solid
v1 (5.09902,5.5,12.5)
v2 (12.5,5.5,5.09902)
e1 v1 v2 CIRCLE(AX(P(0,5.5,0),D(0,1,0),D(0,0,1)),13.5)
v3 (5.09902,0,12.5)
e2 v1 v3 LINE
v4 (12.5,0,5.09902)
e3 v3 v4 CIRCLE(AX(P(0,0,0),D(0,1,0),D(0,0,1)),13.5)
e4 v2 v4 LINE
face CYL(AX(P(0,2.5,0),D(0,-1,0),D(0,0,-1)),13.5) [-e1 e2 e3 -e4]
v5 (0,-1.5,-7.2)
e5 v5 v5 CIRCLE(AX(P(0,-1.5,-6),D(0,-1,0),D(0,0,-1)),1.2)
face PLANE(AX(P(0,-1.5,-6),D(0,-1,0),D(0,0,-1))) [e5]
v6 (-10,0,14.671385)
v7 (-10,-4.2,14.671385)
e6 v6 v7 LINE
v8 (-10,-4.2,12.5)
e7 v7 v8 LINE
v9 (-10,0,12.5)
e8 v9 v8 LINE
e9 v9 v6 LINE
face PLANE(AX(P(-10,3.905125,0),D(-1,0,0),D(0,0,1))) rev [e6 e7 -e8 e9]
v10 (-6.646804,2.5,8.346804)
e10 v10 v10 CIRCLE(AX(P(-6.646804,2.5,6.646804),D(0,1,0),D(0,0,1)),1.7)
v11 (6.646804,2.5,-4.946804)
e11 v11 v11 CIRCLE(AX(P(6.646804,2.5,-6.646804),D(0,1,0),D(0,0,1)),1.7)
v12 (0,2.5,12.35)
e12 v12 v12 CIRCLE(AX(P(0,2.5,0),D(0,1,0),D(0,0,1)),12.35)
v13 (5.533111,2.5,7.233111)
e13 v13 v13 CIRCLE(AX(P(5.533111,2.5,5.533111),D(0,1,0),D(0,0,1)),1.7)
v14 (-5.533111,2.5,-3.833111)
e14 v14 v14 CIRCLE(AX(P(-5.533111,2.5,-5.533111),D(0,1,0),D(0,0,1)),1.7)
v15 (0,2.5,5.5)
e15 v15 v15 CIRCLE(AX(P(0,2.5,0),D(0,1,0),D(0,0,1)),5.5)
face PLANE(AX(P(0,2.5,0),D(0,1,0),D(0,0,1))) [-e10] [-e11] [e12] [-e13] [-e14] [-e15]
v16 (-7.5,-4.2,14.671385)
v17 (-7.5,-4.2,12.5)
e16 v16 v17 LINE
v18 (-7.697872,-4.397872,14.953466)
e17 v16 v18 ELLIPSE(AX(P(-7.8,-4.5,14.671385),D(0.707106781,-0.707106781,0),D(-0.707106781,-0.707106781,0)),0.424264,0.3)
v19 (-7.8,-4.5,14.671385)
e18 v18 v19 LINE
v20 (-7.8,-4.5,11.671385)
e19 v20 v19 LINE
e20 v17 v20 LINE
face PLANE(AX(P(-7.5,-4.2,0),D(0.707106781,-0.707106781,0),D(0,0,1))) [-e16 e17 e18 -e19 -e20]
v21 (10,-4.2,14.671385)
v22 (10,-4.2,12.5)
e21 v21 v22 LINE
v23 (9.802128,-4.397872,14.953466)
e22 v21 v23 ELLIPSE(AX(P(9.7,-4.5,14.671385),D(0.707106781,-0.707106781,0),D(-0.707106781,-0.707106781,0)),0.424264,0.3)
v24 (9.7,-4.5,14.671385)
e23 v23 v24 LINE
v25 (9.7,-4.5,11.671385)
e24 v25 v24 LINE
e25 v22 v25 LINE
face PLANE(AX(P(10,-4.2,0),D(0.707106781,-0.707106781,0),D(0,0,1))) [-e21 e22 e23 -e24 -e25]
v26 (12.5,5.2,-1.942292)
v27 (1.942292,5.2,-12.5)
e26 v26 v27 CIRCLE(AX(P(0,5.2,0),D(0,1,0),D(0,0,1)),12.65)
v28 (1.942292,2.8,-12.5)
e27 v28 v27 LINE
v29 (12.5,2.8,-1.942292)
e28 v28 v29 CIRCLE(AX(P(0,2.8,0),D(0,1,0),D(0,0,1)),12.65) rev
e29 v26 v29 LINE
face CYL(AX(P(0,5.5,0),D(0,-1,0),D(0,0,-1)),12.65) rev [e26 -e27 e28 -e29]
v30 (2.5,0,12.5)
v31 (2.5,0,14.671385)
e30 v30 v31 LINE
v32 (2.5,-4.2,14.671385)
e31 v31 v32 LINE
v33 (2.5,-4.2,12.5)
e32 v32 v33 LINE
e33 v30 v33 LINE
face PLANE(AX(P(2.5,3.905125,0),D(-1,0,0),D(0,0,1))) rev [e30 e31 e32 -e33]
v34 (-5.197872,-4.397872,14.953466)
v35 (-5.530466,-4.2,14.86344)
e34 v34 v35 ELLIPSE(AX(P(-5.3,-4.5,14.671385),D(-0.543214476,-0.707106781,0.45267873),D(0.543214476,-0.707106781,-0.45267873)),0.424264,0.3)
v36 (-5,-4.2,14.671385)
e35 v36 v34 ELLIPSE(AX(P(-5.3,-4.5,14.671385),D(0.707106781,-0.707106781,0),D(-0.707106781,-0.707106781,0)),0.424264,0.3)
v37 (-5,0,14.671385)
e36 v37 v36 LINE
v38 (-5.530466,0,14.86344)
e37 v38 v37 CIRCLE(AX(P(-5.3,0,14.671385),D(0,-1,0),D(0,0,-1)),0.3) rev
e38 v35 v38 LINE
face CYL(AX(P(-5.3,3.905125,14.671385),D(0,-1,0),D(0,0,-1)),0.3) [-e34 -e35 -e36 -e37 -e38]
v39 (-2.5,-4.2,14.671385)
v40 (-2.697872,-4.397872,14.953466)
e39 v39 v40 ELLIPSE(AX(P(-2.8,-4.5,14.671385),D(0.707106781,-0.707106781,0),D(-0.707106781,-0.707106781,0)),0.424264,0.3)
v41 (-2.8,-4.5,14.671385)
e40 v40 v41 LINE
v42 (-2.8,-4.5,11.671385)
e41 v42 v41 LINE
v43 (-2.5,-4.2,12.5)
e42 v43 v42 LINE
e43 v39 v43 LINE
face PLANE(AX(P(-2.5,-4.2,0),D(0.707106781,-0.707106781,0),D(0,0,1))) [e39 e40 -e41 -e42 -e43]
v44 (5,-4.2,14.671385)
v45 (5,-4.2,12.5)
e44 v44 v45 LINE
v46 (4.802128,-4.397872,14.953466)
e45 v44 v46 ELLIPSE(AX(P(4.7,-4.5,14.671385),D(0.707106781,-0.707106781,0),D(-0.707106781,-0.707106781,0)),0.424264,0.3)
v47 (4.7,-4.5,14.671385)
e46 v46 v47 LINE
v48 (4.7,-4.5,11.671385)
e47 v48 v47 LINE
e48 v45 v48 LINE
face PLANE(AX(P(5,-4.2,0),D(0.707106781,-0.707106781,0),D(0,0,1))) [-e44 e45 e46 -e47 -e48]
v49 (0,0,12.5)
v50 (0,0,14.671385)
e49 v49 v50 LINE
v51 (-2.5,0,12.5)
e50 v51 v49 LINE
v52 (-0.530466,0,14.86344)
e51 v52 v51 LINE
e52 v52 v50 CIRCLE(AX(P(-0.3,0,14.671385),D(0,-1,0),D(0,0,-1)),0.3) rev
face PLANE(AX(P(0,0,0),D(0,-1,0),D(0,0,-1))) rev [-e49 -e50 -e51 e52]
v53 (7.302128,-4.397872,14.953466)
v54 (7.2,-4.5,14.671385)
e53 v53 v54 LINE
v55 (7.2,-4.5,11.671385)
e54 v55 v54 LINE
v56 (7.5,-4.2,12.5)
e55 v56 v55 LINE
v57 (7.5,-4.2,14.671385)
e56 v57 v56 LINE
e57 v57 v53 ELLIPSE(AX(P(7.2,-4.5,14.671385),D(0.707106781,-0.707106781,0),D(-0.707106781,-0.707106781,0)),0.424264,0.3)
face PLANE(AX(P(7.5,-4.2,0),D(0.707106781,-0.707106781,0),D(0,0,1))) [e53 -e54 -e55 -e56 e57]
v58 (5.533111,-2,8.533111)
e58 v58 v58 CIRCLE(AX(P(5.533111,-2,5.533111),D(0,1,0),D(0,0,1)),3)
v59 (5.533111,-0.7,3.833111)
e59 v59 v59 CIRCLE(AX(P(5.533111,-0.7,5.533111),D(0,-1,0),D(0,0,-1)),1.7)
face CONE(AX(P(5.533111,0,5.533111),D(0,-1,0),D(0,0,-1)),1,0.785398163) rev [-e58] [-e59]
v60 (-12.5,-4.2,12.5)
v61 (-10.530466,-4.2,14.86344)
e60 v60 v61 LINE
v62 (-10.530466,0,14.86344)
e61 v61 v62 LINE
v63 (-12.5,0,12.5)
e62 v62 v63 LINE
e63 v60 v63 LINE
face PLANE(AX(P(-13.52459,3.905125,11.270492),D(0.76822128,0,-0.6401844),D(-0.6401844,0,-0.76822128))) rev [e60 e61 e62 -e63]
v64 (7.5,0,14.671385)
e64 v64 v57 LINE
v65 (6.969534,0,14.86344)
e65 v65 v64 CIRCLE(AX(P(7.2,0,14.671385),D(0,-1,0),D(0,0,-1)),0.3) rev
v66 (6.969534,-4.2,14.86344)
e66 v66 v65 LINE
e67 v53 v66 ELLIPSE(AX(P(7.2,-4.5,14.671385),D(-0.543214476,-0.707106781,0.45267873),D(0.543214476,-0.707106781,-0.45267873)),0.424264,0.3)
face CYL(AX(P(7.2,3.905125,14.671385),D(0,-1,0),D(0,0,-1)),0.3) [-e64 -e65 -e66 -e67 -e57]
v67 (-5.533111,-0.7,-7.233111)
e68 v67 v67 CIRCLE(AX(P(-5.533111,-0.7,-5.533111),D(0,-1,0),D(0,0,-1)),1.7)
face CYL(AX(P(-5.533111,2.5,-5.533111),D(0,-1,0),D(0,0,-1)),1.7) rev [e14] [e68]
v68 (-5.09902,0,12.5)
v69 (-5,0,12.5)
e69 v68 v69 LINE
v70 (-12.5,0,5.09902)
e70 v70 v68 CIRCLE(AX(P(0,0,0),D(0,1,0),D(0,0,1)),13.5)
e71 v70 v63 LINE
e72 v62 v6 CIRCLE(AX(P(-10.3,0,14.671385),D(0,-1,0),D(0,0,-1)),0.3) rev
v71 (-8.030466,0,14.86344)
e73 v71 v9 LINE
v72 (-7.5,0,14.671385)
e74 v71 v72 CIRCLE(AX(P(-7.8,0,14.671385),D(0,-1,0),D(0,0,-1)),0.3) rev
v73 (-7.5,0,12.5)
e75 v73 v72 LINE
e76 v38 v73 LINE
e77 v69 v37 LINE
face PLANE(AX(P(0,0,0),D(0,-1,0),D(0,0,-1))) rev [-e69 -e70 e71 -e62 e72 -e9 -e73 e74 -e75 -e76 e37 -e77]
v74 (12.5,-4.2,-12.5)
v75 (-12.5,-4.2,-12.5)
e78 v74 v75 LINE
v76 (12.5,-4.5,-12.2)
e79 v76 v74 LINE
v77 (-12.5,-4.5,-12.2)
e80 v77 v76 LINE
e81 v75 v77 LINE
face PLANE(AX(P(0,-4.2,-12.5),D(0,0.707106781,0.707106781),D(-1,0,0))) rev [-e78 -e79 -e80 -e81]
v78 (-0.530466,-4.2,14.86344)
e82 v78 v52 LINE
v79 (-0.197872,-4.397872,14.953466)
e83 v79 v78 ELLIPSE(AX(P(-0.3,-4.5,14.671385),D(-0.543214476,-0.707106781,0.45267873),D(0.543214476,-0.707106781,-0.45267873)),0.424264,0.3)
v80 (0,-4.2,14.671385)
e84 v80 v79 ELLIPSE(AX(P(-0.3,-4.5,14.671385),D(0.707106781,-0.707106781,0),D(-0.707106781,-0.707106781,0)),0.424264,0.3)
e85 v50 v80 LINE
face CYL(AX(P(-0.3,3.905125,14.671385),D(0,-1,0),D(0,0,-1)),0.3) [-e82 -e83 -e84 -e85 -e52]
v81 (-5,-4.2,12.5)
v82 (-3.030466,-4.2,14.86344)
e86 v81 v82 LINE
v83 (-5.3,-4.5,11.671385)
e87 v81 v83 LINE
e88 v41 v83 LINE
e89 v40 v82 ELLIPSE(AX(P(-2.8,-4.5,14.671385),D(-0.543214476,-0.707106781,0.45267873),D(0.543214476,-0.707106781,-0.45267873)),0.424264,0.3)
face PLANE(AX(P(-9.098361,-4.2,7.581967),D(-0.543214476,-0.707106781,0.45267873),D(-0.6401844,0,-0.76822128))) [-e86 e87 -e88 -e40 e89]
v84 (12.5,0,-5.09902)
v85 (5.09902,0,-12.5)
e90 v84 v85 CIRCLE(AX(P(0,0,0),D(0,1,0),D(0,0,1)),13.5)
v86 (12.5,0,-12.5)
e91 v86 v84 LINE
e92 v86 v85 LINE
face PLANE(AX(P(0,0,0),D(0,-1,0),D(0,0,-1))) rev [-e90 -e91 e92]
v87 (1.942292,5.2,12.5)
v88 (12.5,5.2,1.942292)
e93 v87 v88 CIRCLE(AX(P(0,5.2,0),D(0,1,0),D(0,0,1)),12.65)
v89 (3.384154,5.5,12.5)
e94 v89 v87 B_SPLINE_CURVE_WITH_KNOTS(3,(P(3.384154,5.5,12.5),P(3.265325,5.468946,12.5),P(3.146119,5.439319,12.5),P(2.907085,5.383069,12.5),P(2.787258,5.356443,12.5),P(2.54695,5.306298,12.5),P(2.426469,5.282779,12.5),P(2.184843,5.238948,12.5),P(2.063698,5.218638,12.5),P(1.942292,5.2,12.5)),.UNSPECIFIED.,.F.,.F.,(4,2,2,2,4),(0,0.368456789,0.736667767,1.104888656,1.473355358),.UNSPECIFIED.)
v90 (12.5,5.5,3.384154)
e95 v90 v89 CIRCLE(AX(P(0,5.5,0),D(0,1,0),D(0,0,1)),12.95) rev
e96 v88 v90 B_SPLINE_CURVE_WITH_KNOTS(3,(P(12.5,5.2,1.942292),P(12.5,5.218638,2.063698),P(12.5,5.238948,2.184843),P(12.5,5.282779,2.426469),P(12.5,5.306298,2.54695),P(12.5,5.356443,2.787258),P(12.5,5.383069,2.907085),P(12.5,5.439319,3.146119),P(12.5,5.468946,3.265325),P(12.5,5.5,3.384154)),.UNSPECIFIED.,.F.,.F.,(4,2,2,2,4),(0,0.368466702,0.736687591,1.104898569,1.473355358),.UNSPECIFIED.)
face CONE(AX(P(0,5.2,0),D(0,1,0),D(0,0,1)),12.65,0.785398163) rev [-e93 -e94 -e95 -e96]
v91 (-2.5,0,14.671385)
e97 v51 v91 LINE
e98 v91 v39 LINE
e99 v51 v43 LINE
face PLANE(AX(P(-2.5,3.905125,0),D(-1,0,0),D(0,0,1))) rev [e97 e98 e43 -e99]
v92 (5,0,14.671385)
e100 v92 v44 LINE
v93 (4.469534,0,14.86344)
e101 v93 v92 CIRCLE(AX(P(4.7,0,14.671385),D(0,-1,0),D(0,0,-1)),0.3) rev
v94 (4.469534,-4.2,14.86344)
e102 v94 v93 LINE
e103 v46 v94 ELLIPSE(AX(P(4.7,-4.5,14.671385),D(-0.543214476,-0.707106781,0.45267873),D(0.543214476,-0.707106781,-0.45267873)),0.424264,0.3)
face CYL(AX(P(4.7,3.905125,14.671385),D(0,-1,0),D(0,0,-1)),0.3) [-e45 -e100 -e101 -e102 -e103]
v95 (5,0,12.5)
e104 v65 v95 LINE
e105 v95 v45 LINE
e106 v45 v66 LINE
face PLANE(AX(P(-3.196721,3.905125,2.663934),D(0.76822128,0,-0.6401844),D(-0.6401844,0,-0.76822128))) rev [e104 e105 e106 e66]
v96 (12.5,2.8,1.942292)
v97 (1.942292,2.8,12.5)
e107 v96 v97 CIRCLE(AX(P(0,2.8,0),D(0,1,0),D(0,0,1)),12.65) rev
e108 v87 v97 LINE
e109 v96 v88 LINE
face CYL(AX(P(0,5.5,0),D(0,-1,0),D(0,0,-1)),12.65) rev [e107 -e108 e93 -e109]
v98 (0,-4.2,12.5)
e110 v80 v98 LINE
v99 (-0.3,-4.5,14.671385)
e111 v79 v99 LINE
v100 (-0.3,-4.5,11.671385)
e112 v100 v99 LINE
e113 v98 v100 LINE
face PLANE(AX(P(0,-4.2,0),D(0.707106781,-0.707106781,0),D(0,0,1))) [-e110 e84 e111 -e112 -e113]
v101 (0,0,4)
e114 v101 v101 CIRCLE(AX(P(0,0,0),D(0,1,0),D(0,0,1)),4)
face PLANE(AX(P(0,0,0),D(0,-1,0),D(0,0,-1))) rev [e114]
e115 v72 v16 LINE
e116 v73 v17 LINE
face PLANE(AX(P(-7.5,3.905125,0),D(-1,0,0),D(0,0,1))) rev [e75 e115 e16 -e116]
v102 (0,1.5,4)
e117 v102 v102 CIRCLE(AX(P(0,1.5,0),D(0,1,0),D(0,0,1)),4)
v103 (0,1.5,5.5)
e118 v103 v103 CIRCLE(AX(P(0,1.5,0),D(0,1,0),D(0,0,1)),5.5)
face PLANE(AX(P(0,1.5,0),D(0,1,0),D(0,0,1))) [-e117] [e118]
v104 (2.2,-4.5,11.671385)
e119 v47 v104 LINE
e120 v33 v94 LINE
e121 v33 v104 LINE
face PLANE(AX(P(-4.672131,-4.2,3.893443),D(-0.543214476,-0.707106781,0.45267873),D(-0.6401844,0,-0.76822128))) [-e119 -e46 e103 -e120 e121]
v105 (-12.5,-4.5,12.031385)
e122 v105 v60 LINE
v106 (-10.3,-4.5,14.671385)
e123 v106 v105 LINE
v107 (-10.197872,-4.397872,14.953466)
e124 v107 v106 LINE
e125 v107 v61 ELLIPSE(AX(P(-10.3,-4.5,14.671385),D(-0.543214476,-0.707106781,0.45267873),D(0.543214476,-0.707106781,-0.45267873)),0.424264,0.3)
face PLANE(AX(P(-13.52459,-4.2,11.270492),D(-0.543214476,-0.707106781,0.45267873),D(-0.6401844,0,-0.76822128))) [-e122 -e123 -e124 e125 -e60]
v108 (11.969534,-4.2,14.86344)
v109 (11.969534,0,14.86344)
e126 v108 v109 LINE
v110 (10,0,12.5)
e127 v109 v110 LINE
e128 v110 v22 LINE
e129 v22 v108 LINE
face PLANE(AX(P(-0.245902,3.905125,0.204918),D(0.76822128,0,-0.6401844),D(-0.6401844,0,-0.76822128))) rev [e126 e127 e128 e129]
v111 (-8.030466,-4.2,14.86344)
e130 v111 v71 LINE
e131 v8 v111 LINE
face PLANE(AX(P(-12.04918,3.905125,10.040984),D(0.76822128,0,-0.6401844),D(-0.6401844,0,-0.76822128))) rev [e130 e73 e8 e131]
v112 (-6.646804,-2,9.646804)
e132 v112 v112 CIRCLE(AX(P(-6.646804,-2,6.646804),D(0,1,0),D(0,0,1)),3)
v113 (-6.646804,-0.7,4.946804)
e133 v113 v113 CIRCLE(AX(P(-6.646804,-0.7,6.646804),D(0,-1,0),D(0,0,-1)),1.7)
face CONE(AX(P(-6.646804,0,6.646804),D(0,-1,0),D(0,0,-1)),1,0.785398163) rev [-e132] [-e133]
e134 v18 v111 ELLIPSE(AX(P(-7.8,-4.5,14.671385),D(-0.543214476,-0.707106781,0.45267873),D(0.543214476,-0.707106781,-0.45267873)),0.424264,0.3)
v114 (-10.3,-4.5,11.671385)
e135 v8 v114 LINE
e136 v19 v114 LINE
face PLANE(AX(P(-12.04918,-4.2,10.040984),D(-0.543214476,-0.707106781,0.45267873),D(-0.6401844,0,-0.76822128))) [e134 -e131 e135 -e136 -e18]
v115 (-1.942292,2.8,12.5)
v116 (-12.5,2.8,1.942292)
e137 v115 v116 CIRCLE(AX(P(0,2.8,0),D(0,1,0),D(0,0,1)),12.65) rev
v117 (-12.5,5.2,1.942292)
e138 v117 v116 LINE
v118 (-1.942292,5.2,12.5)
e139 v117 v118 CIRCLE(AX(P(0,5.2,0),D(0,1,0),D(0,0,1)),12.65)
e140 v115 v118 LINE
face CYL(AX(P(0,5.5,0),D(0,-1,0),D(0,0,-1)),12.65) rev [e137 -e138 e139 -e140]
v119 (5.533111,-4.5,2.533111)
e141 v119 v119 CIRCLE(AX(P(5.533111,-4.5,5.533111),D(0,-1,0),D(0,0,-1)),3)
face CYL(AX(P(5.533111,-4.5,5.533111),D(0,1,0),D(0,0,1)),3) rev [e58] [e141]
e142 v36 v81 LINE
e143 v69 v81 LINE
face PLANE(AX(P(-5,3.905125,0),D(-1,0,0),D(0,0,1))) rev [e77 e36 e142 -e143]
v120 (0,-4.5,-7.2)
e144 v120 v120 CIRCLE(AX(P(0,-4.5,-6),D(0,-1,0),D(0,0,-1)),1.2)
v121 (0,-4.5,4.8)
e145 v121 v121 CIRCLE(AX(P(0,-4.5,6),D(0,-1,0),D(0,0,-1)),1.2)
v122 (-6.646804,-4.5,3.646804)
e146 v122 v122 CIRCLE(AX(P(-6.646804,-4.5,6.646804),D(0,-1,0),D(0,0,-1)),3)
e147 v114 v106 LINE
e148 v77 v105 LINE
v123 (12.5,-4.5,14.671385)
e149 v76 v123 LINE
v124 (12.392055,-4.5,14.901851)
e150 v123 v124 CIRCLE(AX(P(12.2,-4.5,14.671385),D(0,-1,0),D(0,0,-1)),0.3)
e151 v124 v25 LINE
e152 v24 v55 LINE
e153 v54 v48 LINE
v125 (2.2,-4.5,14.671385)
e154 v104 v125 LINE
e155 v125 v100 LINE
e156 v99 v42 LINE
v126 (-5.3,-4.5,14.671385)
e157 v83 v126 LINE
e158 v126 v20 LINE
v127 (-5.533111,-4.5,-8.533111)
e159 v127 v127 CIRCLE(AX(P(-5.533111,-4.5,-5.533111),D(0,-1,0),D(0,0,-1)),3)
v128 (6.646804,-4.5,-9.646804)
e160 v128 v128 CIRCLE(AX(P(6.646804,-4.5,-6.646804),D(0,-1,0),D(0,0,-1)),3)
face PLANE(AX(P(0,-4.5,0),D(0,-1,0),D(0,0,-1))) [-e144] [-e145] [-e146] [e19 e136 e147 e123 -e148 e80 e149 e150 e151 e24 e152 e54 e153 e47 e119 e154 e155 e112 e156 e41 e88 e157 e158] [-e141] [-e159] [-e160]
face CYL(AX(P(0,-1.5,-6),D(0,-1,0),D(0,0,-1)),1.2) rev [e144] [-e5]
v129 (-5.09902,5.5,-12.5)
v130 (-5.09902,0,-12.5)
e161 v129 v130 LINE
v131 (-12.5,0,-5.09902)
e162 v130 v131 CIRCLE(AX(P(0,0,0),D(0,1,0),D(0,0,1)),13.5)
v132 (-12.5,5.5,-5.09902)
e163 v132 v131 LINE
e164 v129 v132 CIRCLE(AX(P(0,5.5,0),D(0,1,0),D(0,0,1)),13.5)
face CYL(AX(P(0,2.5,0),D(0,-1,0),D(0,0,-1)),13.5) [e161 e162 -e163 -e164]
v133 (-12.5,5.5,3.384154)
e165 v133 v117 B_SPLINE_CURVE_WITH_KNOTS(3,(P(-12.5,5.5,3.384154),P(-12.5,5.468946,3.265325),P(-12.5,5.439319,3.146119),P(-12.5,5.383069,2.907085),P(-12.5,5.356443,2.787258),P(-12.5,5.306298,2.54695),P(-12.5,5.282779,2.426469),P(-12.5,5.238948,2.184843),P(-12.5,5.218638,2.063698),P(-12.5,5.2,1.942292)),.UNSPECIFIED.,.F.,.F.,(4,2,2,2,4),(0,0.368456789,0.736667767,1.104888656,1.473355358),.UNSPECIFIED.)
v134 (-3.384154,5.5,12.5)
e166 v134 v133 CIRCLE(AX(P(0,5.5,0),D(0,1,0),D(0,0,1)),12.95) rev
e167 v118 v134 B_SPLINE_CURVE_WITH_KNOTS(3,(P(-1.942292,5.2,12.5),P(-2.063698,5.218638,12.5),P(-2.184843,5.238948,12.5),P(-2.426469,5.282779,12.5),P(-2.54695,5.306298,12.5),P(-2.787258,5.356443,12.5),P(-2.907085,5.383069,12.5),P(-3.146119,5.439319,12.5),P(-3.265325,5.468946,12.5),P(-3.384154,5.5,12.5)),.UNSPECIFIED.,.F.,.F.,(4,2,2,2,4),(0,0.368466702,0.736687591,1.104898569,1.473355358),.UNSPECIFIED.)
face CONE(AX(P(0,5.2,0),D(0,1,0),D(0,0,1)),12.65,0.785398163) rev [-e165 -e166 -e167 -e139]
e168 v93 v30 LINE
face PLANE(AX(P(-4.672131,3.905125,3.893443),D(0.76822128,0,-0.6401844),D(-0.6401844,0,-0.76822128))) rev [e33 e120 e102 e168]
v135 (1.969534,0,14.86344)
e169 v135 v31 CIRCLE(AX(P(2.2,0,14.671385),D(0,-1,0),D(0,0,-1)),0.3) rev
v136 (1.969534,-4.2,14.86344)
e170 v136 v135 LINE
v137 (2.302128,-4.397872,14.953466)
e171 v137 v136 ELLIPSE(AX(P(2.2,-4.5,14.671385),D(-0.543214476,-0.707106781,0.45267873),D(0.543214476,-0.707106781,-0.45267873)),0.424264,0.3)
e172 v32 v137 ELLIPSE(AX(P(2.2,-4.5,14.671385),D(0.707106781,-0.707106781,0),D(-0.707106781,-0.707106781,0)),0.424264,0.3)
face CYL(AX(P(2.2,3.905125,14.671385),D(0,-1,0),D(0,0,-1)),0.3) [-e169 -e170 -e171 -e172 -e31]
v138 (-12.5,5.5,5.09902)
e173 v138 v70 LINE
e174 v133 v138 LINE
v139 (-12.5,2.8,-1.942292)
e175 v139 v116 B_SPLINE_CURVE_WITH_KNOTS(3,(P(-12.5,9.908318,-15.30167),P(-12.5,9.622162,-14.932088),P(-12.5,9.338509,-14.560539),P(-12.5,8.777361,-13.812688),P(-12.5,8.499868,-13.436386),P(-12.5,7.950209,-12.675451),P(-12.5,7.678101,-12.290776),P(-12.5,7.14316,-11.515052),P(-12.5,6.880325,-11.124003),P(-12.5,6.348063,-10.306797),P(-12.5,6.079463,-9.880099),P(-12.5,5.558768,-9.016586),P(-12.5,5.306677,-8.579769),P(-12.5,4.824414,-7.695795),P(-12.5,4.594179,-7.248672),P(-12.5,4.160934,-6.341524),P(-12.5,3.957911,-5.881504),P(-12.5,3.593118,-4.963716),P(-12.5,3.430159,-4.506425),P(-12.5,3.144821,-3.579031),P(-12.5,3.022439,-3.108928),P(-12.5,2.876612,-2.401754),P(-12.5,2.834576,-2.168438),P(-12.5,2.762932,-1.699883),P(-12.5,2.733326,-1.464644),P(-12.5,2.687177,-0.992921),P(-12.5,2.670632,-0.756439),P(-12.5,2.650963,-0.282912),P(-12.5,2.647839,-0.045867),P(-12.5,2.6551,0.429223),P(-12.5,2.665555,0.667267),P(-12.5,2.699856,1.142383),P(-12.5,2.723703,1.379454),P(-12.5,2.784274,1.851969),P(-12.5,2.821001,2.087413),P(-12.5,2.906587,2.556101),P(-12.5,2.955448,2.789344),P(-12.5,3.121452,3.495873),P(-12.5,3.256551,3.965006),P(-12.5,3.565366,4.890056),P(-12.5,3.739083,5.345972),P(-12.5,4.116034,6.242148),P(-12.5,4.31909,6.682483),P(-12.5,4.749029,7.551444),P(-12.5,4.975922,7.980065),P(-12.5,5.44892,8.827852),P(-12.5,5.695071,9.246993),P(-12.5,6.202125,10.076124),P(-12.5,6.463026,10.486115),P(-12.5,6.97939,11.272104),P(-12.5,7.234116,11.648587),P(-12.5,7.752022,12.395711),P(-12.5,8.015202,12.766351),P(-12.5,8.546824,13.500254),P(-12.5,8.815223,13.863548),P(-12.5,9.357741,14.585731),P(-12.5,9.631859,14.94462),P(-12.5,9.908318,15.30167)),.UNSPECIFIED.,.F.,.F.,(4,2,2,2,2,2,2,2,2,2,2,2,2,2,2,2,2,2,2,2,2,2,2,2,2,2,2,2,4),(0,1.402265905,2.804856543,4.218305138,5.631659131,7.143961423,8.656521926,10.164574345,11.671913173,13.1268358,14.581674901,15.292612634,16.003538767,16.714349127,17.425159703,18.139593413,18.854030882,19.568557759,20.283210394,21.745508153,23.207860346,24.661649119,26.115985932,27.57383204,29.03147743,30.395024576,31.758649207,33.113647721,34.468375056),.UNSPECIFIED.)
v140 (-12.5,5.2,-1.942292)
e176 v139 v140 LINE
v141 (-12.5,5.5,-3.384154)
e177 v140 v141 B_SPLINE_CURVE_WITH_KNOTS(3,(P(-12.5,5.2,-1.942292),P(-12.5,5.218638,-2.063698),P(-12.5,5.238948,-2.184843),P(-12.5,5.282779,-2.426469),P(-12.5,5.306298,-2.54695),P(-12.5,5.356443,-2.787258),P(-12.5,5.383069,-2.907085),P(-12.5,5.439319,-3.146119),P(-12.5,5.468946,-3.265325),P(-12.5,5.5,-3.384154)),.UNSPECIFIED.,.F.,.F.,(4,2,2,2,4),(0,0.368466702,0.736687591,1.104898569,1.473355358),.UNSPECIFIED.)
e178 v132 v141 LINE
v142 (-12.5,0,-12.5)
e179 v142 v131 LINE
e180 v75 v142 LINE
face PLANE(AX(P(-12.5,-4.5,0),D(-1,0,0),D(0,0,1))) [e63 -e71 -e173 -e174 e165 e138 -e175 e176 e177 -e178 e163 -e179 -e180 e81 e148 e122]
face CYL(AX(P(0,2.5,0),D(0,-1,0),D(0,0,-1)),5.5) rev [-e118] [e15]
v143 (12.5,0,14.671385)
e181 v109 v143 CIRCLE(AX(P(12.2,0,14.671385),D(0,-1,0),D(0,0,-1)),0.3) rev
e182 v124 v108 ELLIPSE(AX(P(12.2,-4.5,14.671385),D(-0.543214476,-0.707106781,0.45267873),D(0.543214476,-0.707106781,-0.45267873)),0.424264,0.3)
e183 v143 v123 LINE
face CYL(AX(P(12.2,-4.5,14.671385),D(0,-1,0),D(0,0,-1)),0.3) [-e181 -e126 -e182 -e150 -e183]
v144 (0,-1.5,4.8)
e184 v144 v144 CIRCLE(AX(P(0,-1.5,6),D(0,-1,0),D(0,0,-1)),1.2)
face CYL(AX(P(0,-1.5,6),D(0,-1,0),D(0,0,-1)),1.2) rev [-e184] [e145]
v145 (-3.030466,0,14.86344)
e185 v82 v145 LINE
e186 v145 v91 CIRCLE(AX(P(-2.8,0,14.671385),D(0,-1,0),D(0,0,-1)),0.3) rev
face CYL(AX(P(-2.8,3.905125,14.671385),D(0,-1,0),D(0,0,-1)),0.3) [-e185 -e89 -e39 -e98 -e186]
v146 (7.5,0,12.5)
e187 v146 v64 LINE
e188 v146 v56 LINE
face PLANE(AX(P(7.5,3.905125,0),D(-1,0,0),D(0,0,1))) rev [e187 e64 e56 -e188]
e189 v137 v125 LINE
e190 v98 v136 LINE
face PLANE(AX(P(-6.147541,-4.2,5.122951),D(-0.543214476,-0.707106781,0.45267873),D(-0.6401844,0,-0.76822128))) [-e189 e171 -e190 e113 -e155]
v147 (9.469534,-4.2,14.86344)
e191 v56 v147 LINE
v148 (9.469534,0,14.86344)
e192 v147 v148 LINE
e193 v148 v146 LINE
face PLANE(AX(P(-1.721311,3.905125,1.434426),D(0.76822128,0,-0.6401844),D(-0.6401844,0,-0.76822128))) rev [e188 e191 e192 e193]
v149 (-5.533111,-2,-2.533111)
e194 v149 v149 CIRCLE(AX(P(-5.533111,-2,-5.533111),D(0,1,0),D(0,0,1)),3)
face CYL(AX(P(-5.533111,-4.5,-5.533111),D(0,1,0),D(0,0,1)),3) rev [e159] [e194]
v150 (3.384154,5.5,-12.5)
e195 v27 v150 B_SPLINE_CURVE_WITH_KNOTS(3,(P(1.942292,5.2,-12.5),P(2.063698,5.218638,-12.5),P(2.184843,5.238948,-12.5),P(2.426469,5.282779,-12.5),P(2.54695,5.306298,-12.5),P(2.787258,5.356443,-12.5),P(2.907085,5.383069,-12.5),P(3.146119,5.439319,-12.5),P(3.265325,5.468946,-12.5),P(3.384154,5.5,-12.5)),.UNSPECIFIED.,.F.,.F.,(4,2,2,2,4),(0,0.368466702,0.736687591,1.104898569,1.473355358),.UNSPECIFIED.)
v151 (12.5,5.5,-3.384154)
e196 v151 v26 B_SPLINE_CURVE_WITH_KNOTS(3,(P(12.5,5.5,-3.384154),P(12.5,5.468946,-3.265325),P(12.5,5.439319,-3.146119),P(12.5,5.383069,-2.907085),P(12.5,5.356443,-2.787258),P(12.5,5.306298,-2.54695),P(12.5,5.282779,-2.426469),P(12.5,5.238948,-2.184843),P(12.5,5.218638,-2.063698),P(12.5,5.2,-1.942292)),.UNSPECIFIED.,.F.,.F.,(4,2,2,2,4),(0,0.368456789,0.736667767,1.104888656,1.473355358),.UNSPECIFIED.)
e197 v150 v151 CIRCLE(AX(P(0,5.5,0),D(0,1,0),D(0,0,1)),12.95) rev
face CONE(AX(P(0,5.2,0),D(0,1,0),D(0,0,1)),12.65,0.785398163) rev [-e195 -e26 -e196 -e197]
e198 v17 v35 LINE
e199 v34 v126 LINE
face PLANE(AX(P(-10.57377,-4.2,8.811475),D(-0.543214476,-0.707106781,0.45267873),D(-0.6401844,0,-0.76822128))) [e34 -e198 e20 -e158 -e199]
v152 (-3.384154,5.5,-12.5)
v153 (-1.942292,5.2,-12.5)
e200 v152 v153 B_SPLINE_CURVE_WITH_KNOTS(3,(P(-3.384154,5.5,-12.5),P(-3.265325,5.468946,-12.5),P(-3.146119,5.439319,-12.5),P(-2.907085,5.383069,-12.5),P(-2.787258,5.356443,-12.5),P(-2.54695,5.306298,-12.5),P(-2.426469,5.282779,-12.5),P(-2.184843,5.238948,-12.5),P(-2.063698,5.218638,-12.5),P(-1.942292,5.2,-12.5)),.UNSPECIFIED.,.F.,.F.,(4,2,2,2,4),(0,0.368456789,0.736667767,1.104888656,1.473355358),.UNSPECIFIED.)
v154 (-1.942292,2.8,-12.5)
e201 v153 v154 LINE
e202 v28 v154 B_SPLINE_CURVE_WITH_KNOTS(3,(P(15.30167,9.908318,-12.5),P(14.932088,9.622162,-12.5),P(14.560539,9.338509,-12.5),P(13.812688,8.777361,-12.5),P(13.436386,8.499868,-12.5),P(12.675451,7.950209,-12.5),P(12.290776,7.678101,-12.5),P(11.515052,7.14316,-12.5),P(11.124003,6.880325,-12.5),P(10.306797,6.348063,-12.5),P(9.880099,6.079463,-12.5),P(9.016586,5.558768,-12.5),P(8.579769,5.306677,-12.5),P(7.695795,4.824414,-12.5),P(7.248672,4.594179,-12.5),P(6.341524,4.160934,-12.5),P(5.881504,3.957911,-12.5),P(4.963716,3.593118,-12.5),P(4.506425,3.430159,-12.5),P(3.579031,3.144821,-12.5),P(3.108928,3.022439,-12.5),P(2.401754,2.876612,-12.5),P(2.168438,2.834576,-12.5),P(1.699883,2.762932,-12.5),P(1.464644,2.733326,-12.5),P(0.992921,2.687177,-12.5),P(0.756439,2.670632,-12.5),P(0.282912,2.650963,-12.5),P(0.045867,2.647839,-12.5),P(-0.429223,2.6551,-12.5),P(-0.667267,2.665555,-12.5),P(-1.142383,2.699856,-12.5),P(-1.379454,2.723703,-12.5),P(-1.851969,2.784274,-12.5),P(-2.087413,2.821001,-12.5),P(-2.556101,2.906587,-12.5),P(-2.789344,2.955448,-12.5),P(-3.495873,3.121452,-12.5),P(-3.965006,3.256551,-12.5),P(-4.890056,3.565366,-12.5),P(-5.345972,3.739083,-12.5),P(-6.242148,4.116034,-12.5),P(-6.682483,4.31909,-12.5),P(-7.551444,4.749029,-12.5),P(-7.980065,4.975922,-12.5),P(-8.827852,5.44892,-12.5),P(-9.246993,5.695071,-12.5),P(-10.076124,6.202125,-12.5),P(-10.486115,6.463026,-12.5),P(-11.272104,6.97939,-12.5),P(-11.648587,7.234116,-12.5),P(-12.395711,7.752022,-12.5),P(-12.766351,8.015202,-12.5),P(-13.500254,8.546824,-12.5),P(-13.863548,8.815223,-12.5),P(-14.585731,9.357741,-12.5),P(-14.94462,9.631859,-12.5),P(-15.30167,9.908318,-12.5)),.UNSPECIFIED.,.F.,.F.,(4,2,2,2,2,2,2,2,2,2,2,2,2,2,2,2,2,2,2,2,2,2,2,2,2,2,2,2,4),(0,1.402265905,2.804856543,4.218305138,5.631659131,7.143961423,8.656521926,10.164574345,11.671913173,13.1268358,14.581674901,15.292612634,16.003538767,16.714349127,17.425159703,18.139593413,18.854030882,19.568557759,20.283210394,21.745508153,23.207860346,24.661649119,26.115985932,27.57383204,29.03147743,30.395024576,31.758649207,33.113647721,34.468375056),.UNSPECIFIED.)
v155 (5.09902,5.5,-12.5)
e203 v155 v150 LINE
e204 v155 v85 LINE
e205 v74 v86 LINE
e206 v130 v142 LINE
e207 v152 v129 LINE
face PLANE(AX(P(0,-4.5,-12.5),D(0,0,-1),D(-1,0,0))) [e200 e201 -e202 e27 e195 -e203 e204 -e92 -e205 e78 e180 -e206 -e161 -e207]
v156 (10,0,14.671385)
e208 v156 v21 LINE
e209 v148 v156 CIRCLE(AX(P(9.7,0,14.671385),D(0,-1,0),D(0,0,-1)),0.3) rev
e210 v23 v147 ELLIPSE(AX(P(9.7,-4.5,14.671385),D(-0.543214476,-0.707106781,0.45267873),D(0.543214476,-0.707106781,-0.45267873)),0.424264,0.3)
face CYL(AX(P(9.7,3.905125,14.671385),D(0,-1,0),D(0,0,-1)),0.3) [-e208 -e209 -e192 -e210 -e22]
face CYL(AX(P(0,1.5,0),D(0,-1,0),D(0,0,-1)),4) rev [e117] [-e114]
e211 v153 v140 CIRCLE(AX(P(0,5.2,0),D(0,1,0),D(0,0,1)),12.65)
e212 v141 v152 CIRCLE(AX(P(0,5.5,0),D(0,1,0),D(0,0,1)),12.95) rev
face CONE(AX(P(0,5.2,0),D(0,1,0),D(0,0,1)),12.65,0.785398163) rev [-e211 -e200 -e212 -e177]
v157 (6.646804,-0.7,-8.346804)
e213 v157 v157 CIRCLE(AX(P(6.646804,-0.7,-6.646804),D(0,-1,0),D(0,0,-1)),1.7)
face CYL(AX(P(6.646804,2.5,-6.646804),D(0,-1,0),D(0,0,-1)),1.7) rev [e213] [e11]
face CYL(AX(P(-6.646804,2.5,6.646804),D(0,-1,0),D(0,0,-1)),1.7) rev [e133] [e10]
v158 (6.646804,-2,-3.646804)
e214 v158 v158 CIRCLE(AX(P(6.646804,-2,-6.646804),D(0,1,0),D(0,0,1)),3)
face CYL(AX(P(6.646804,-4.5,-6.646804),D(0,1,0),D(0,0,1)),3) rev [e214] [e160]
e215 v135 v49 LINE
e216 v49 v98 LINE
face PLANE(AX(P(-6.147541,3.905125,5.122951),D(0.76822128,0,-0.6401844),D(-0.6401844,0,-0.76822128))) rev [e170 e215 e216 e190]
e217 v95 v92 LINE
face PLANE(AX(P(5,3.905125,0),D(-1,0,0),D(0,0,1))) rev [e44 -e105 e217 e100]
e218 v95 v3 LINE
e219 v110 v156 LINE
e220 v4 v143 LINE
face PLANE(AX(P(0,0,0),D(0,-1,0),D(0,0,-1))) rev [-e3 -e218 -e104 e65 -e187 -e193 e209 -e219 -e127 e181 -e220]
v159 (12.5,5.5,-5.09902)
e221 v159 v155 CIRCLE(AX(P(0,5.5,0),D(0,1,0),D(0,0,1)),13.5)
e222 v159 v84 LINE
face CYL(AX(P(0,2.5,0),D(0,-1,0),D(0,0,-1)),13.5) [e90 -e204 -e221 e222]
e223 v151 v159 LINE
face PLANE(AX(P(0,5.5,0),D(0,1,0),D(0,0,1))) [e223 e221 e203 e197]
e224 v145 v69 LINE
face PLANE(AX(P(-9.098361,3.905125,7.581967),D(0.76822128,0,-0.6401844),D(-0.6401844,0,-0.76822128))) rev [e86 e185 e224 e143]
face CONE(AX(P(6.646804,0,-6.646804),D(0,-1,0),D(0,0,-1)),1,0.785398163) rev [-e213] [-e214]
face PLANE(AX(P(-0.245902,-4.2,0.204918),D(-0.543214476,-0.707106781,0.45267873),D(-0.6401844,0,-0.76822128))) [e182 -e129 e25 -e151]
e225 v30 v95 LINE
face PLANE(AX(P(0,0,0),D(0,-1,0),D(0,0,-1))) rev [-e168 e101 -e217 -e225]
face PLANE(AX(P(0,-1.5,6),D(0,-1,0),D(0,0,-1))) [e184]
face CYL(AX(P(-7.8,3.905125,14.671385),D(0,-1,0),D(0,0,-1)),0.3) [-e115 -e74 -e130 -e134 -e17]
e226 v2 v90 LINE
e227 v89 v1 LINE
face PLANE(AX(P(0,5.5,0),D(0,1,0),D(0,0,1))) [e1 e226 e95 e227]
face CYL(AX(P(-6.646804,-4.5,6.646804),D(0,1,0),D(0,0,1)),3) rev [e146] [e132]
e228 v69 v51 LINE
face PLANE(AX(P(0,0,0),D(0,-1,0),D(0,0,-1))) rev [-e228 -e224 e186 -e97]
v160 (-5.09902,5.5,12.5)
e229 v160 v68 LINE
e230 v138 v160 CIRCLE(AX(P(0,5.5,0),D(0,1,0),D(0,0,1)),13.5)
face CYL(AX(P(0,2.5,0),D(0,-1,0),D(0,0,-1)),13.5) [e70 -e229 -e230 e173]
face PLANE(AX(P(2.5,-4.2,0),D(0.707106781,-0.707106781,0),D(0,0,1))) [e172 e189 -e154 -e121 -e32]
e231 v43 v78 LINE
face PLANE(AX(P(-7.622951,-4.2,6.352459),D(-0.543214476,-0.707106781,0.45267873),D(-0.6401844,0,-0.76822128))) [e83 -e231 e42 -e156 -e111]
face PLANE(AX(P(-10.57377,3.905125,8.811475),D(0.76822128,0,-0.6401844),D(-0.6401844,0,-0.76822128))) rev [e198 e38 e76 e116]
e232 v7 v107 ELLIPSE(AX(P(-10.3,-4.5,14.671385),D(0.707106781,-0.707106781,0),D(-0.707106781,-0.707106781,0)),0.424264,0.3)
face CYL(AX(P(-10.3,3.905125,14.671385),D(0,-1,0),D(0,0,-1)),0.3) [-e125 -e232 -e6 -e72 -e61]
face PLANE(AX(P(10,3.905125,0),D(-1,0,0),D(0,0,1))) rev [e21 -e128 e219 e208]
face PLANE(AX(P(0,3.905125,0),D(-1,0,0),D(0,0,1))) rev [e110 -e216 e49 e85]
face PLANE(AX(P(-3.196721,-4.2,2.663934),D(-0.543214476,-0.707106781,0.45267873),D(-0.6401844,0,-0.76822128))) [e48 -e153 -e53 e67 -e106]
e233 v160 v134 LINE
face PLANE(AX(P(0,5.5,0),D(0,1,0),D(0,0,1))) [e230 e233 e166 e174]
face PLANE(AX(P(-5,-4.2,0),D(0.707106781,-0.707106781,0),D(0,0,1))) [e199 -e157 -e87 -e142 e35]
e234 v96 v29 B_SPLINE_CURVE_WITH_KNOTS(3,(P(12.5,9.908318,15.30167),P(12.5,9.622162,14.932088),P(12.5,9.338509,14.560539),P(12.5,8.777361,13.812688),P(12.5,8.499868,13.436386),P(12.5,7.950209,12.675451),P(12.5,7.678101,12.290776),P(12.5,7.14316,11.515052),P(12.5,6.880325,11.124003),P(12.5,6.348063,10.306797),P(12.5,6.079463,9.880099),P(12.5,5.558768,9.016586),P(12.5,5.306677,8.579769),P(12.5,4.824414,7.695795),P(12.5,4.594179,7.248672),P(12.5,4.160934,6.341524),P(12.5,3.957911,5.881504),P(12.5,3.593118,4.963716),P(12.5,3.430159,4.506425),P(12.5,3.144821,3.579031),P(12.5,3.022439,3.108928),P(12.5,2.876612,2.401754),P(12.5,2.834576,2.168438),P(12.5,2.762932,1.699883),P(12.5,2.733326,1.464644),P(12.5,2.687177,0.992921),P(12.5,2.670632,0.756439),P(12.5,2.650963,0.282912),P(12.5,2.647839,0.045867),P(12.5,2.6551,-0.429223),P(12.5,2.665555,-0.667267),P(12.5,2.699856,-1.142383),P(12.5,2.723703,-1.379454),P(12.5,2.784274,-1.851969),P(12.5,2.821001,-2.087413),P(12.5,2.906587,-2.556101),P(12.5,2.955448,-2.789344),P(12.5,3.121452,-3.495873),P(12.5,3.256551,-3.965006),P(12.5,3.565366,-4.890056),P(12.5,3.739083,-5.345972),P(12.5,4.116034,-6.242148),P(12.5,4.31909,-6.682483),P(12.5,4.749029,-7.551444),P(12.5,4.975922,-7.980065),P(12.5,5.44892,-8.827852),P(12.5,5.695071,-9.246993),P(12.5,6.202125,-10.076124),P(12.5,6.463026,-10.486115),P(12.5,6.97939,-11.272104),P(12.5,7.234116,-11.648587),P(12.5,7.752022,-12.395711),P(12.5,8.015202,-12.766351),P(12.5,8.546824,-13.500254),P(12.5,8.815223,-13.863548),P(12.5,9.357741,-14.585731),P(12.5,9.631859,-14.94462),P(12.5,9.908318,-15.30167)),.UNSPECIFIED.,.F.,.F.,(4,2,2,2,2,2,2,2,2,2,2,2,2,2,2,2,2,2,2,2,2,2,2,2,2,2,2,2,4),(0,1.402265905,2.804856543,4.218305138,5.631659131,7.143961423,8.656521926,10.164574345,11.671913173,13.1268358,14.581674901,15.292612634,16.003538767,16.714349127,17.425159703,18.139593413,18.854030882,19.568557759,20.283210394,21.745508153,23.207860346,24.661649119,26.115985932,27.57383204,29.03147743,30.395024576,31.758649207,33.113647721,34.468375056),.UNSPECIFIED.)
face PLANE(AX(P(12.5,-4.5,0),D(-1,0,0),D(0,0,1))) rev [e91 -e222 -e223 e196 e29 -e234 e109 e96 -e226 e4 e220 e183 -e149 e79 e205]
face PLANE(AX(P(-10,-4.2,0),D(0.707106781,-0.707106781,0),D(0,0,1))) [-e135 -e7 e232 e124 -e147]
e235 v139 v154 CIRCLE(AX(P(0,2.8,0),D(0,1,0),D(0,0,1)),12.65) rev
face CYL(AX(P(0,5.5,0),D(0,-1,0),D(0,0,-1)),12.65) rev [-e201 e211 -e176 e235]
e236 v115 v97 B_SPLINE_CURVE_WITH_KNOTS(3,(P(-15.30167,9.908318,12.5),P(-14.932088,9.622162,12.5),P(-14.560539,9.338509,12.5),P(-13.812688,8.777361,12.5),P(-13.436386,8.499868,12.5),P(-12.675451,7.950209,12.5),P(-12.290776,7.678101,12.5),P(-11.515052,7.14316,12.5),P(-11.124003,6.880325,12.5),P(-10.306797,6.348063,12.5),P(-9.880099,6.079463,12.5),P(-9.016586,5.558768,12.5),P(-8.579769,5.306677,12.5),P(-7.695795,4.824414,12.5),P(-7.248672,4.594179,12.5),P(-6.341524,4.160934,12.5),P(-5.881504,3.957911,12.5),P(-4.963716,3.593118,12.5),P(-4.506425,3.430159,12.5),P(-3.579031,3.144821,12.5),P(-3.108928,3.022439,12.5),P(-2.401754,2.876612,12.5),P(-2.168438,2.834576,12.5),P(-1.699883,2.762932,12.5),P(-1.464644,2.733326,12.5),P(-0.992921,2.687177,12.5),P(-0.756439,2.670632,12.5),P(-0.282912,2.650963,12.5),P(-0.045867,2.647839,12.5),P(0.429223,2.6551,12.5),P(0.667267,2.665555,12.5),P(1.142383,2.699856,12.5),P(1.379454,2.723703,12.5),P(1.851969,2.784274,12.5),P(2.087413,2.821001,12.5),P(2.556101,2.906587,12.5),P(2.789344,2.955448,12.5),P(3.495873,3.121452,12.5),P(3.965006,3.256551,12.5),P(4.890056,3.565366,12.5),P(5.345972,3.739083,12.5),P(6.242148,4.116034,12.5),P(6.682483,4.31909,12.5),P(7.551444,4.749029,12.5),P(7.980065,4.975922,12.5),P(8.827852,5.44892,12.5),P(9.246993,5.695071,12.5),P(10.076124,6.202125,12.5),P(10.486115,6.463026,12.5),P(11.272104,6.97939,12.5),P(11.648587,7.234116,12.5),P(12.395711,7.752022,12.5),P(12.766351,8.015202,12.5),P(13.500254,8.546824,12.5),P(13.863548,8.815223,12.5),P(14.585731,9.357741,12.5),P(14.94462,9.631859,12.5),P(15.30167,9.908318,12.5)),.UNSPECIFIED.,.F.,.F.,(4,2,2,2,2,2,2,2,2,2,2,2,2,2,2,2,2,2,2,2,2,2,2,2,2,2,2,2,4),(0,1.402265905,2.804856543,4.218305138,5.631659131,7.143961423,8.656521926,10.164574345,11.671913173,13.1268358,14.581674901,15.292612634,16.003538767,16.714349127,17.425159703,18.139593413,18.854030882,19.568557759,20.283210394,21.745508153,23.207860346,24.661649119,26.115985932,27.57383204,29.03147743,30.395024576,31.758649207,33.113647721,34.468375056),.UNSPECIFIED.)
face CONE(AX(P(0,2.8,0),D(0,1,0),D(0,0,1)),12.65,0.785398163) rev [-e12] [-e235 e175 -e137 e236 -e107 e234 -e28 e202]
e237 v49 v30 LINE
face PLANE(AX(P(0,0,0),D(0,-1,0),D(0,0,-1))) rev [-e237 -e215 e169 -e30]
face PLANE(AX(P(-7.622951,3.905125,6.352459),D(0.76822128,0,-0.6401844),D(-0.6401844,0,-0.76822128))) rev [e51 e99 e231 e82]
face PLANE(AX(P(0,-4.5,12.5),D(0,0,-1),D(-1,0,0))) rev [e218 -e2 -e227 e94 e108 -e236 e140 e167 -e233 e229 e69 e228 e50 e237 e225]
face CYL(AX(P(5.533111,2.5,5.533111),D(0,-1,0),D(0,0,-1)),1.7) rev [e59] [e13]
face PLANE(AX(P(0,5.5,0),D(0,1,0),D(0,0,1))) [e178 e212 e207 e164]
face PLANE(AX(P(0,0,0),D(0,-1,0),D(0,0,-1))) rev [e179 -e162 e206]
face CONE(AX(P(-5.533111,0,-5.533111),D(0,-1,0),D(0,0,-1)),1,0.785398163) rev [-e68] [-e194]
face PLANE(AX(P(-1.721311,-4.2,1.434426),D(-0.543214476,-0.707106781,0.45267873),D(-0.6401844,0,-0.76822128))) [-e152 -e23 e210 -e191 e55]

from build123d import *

# Parameters (mm, degrees)
SKETCH1_R           = 13.5
SKETCH1_R_2         = 1.7
SKETCH1_R_3         = 5.5
BOSS_EXTRUDE1_DEPTH = 2.5
SKETCH2_R           = 13.5
SKETCH2_R_2         = 12.65
BOSS_EXTRUDE2_DEPTH = 3
SKETCH3_W           = 25
SKETCH3_H           = 25
SKETCH3_R           = 3
BOSS_EXTRUDE3_DEPTH = 4.5
CHAMFER2_SIZE       = 0.3
SKETCH4_R           = 4
BOSS_EXTRUDE4_DEPTH = 1.5
CUT_EXTRUDE1_DEPTH  = 20.868316486
CHAMFER3_SIZE       = 0.3
BOSS_EXTRUDE5_DEPTH = 4.5
CHAMFER4_SIZE       = 0.3
FILLET1_R           = 0.3
SKETCH8_R           = 1.2
CUT_EXTRUDE2_DEPTH  = 3
CHAMFER5_SIZE       = 2


with BuildPart() as part:
    # Sketch1 → Boss-Extrude1 (new body)
    with BuildSketch(Plane(origin=(0, 0, 0), x_dir=(1, 0, 0), z_dir=(0, 1, 0))):
        with Locations(Location((0, 0, 0), (0, 0, 270))):
            Circle(SKETCH1_R)
        with Locations(Location((6.646803743, 6.646803743, 0), (0, 0, 270))):
            Circle(SKETCH1_R_2, mode=Mode.SUBTRACT)
        with Locations(Location((-6.646803743, -6.646803743, 0), (0, 0, 270))):
            Circle(SKETCH1_R_2, mode=Mode.SUBTRACT)
        with Locations(Location((5.533110563, -5.533110563, 0), (0, 0, 270))):
            Circle(SKETCH1_R_2, mode=Mode.SUBTRACT)
        with Locations(Location((-5.533110563, 5.533110563, 0), (0, 0, 270))):
            Circle(SKETCH1_R_2, mode=Mode.SUBTRACT)
        with Locations(Location((0, 0, 0), (0, 0, 270))):
            Circle(SKETCH1_R_3, mode=Mode.SUBTRACT)
    extrude(amount=BOSS_EXTRUDE1_DEPTH)

    # Sketch2 → Boss-Extrude2 (add)
    with BuildSketch(Plane(origin=(0, 2.5, 0), x_dir=(1, 0, 0), z_dir=(0, 1, 0))):
        with Locations(Location((0, 0, 0), (0, 0, 270))):
            Circle(SKETCH2_R)
        with Locations(Location((0, 0, 0), (0, 0, 270))):
            Circle(SKETCH2_R_2, mode=Mode.SUBTRACT)
    extrude(amount=BOSS_EXTRUDE2_DEPTH)

    # Sketch3 → Boss-Extrude3 (add)
    with BuildSketch(Plane.XZ):
        Rectangle(SKETCH3_W, SKETCH3_H)
        with Locations(Location((-6.646803743, 6.646803743, 0), (0, 0, 270))):
            Circle(SKETCH3_R, mode=Mode.SUBTRACT)
        with Locations(Location((5.533110563, 5.533110563, 0), (0, 0, 193.381478788))):
            Circle(SKETCH3_R, mode=Mode.SUBTRACT)
        with Locations(Location((6.646803743, -6.646803743, 0), (0, 0, 270))):
            Circle(SKETCH3_R, mode=Mode.SUBTRACT)
        with Locations(Location((-5.533110563, -5.533110563, 0), (0, 0, 76.618521212))):
            Circle(SKETCH3_R, mode=Mode.SUBTRACT)
    extrude(amount=BOSS_EXTRUDE3_DEPTH)

    # Chamfer2
    chamfer2_edges = [part.edges().sort_by_distance(p)[0] for p in [
        (0, 2.5, -12.65),
    ]]
    chamfer(chamfer2_edges, length=CHAMFER2_SIZE)

    # Sketch4 → Boss-Extrude4 (add)
    # profile 1 of 3: a face of its own
    with BuildSketch(Plane(origin=(0, 0, 0), x_dir=(1, 0, 0), z_dir=(0, 1, 0))):
        with BuildLine():
            ThreePointArc((-4.838810256, 2.614558339), (-3.889087297, -3.889087297), (2.614558339, -4.838810256))
            ThreePointArc((2.614558339, -4.838810256), (3.411790219, -3.411790219), (4.838810256, -2.614558339))
            ThreePointArc((4.838810256, -2.614558339), (3.889087297, 3.889087297), (-2.614558339, 4.838810256))
            ThreePointArc((-2.614558339, 4.838810256), (-3.411790219, 3.411790219), (-4.838810256, 2.614558339))
        make_face()
        with Locations(Location((0, 0, 0), (0, 0, 270))):
            Circle(SKETCH4_R, mode=Mode.SUBTRACT)
    # profile 2 of 3: a face of its own
    with BuildSketch(Plane(origin=(0, 0, 0), x_dir=(1, 0, 0), z_dir=(0, 1, 0))):
        with BuildLine():
            ThreePointArc((-4.838810256, 2.614558339), (-3.411790219, 3.411790219), (-2.614558339, 4.838810256))
            ThreePointArc((-2.614558339, 4.838810256), (-3.889087297, 3.889087297), (-4.838810256, 2.614558339))
        make_face()
    # profile 3 of 3: a face of its own
    with BuildSketch(Plane(origin=(0, 0, 0), x_dir=(1, 0, 0), z_dir=(0, 1, 0))):
        with BuildLine():
            ThreePointArc((2.614558339, -4.838810256), (3.889087297, -3.889087297), (4.838810256, -2.614558339))
            ThreePointArc((4.838810256, -2.614558339), (3.411790219, -3.411790219), (2.614558339, -4.838810256))
        make_face()
    extrude(amount=BOSS_EXTRUDE4_DEPTH)

    # Sketch6 → Cut-Extrude1 (cut, through all)
    with BuildSketch(Plane.XZ):
        with BuildLine():
            Line((5.099019514, -12.5), (-5.099019514, -12.5))
            ThreePointArc((-5.099019514, -12.5), (0, -13.5), (5.099019514, -12.5))
        make_face()
        with BuildLine():
            Line((12.5, 5.099019514), (12.5, -5.099019514))
            ThreePointArc((12.5, -5.099019514), (13.5, 0), (12.5, 5.099019514))
        make_face()
        with BuildLine():
            Line((-5.099019514, 12.5), (5.099019514, 12.5))
            ThreePointArc((5.099019514, 12.5), (0, 13.5), (-5.099019514, 12.5))
        make_face()
        with BuildLine():
            Line((-12.5, -5.099019514), (-12.5, 5.099019514))
            ThreePointArc((-12.5, 5.099019514), (-13.5, 0), (-12.5, -5.099019514))
        make_face()
    extrude(amount=-CUT_EXTRUDE1_DEPTH, mode=Mode.SUBTRACT)

    # Chamfer3
    chamfer3_edges = [part.edges().sort_by_distance(p)[0] for p in [
        (8.944900782, 5.5, -8.944900782),
        (-8.944900782, 5.5, -8.944900782),
        (-8.944900782, 5.5, 8.944900782),
        (8.944900782, 5.5, 8.944900782),
    ]]
    chamfer(chamfer3_edges, length=CHAMFER3_SIZE)

    # Sketch7 → Boss-Extrude5 (add)
    with BuildSketch(Plane.XZ.offset(4.5)):
        Polygon((-12.5, 12.5), (-10, 12.5), (-10, 15.5), align=None)
        Polygon((-10, 12.5), (-7.5, 12.5), (-7.5, 15.5), align=None)
        Polygon((-7.5, 12.5), (-5, 12.5), (-5, 15.5), align=None)
        Polygon((-5, 12.5), (-2.5, 12.5), (-2.5, 15.5), align=None)
        Polygon((-2.5, 12.5), (0, 12.5), (0, 15.5), align=None)
        Polygon((0, 12.5), (2.5, 12.5), (2.5, 15.5), align=None)
        Polygon((2.5, 12.5), (5, 12.5), (5, 15.5), align=None)
        Polygon((5, 12.5), (7.5, 12.5), (7.5, 15.5), align=None)
        Polygon((7.5, 12.5), (10, 12.5), (10, 15.5), align=None)
        Polygon((10, 12.5), (12.5, 12.5), (12.5, 15.5), align=None)
    extrude(amount=-BOSS_EXTRUDE5_DEPTH)

    # Chamfer4
    chamfer4_edges = [part.edges().sort_by_distance(p)[0] for p in [
        (-11.25, -4.5, 14),
        (-10, -4.5, 14),
        (-7.5, -4.5, 14),
        (-8.75, -4.5, 14),
        (-5, -4.5, 14),
        (-6.25, -4.5, 14),
        (-2.5, -4.5, 14),
        (-3.75, -4.5, 14),
        (0, -4.5, 14),
        (-1.25, -4.5, 14),
        (2.5, -4.5, 14),
        (1.25, -4.5, 14),
        (5, -4.5, 14),
        (3.75, -4.5, 14),
        (7.5, -4.5, 14),
        (6.25, -4.5, 14),
        (10, -4.5, 14),
        (8.75, -4.5, 14),
        (11.25, -4.5, 14),
        (0, -4.5, -12.5),
    ]]
    chamfer(chamfer4_edges, length=CHAMFER4_SIZE)

    # Fillet1
    fillet1_edges = [part.edges().sort_by_distance(p)[0] for p in [
        (10, -2.1, 15.5),
        (7.5, -2.1, 15.5),
        (5, -2.1, 15.5),
        (2.5, -2.1, 15.5),
        (0, -2.1, 15.5),
        (-2.5, -2.1, 15.5),
        (-5, -2.1, 15.5),
        (-7.5, -2.1, 15.5),
        (-10, -2.1, 15.5),
        (12.5, -2.1, 15.5),
    ]]
    fillet(fillet1_edges, radius=FILLET1_R)

    # Sketch8 → Cut-Extrude2 (cut)
    with BuildSketch(Plane.XZ.offset(4.5)):
        with Locations(Location((0, 6, 0), (0, 0, 270))):
            Circle(SKETCH8_R)
        with Locations(Location((0, -6, 0), (0, 0, 270))):
            Circle(SKETCH8_R)
    extrude(amount=-CUT_EXTRUDE2_DEPTH, mode=Mode.SUBTRACT)

    # Chamfer5
    # the kernel refuses this chamfer: 2 mm, written as the material it adds along each edge
    with BuildSketch(Plane(origin=(-5.533110563, 0, -5.533110563), x_dir=(0.2314334356248564, 0, 0.9728507413138335), z_dir=(0.9728507413138335, 0, -0.2314334356248564))) as chamfer5_piece_1_section:
        Polygon((3, CHAMFER5_SIZE), (3 - CHAMFER5_SIZE, 0), (3, 0), align=None)
    chamfer5_piece_1 = revolve(axis=Axis((-5.533110563, 0, -5.533110563), (0, -1, 0)), mode=Mode.PRIVATE)
    chamfer5_piece_1 = chamfer5_piece_1 - Plane(origin=(-5.533110563, -1.35638922, -5.533110563), x_dir=(0, 0, 1), z_dir=(0, -1, 0)) * Cylinder(1.7, 13, mode=Mode.PRIVATE)
    add(chamfer5_piece_1)
    with BuildSketch(Plane(origin=(5.533110563, 0, 5.533110563), x_dir=(-0.9728507413138336, 0, -0.23143343562485635), z_dir=(-0.23143343562485635, 0, 0.9728507413138336))) as chamfer5_piece_2_section:
        Polygon((3, CHAMFER5_SIZE), (3 - CHAMFER5_SIZE, 0), (3, 0), align=None)
    chamfer5_piece_2 = revolve(axis=Axis((5.533110563, 0, 5.533110563), (0, -1, 0)), mode=Mode.PRIVATE)
    chamfer5_piece_2 = chamfer5_piece_2 - Plane(origin=(5.533110563, -1.35638922, 5.533110563), x_dir=(0, 0, 1), z_dir=(0, -1, 0)) * Cylinder(1.7, 12, mode=Mode.PRIVATE)
    add(chamfer5_piece_2)
    with BuildSketch(Plane(origin=(6.646803743, 0, -6.646803743), x_dir=(0, 0, -1), z_dir=(-1, 0, 0))) as chamfer5_piece_3_section:
        Polygon((3, CHAMFER5_SIZE), (3 - CHAMFER5_SIZE, 0), (3, 0), align=None)
    chamfer5_piece_3 = revolve(axis=Axis((6.646803743, 0, -6.646803743), (0, -1, 0)), mode=Mode.PRIVATE)
    chamfer5_piece_3 = chamfer5_piece_3 - Plane(origin=(6.646803743, -1.35638922, -6.646803743), x_dir=(0, 0, 1), z_dir=(0, -1, 0)) * Cylinder(1.7, 13, mode=Mode.PRIVATE)
    add(chamfer5_piece_3)
    with BuildSketch(Plane(origin=(-6.646803743, 0, 6.646803743), x_dir=(0, 0, -1), z_dir=(-1, 0, 0))) as chamfer5_piece_4_section:
        Polygon((3, CHAMFER5_SIZE), (3 - CHAMFER5_SIZE, 0), (3, 0), align=None)
    chamfer5_piece_4 = revolve(axis=Axis((-6.646803743, 0, 6.646803743), (0, -1, 0)), mode=Mode.PRIVATE)
    chamfer5_piece_4 = chamfer5_piece_4 - Plane(origin=(-6.646803743, -1.35638922, 6.646803743), x_dir=(0, 0, 1), z_dir=(0, -1, 0)) * Cylinder(1.7, 13, mode=Mode.PRIVATE)
    add(chamfer5_piece_4)


solid = part.part
